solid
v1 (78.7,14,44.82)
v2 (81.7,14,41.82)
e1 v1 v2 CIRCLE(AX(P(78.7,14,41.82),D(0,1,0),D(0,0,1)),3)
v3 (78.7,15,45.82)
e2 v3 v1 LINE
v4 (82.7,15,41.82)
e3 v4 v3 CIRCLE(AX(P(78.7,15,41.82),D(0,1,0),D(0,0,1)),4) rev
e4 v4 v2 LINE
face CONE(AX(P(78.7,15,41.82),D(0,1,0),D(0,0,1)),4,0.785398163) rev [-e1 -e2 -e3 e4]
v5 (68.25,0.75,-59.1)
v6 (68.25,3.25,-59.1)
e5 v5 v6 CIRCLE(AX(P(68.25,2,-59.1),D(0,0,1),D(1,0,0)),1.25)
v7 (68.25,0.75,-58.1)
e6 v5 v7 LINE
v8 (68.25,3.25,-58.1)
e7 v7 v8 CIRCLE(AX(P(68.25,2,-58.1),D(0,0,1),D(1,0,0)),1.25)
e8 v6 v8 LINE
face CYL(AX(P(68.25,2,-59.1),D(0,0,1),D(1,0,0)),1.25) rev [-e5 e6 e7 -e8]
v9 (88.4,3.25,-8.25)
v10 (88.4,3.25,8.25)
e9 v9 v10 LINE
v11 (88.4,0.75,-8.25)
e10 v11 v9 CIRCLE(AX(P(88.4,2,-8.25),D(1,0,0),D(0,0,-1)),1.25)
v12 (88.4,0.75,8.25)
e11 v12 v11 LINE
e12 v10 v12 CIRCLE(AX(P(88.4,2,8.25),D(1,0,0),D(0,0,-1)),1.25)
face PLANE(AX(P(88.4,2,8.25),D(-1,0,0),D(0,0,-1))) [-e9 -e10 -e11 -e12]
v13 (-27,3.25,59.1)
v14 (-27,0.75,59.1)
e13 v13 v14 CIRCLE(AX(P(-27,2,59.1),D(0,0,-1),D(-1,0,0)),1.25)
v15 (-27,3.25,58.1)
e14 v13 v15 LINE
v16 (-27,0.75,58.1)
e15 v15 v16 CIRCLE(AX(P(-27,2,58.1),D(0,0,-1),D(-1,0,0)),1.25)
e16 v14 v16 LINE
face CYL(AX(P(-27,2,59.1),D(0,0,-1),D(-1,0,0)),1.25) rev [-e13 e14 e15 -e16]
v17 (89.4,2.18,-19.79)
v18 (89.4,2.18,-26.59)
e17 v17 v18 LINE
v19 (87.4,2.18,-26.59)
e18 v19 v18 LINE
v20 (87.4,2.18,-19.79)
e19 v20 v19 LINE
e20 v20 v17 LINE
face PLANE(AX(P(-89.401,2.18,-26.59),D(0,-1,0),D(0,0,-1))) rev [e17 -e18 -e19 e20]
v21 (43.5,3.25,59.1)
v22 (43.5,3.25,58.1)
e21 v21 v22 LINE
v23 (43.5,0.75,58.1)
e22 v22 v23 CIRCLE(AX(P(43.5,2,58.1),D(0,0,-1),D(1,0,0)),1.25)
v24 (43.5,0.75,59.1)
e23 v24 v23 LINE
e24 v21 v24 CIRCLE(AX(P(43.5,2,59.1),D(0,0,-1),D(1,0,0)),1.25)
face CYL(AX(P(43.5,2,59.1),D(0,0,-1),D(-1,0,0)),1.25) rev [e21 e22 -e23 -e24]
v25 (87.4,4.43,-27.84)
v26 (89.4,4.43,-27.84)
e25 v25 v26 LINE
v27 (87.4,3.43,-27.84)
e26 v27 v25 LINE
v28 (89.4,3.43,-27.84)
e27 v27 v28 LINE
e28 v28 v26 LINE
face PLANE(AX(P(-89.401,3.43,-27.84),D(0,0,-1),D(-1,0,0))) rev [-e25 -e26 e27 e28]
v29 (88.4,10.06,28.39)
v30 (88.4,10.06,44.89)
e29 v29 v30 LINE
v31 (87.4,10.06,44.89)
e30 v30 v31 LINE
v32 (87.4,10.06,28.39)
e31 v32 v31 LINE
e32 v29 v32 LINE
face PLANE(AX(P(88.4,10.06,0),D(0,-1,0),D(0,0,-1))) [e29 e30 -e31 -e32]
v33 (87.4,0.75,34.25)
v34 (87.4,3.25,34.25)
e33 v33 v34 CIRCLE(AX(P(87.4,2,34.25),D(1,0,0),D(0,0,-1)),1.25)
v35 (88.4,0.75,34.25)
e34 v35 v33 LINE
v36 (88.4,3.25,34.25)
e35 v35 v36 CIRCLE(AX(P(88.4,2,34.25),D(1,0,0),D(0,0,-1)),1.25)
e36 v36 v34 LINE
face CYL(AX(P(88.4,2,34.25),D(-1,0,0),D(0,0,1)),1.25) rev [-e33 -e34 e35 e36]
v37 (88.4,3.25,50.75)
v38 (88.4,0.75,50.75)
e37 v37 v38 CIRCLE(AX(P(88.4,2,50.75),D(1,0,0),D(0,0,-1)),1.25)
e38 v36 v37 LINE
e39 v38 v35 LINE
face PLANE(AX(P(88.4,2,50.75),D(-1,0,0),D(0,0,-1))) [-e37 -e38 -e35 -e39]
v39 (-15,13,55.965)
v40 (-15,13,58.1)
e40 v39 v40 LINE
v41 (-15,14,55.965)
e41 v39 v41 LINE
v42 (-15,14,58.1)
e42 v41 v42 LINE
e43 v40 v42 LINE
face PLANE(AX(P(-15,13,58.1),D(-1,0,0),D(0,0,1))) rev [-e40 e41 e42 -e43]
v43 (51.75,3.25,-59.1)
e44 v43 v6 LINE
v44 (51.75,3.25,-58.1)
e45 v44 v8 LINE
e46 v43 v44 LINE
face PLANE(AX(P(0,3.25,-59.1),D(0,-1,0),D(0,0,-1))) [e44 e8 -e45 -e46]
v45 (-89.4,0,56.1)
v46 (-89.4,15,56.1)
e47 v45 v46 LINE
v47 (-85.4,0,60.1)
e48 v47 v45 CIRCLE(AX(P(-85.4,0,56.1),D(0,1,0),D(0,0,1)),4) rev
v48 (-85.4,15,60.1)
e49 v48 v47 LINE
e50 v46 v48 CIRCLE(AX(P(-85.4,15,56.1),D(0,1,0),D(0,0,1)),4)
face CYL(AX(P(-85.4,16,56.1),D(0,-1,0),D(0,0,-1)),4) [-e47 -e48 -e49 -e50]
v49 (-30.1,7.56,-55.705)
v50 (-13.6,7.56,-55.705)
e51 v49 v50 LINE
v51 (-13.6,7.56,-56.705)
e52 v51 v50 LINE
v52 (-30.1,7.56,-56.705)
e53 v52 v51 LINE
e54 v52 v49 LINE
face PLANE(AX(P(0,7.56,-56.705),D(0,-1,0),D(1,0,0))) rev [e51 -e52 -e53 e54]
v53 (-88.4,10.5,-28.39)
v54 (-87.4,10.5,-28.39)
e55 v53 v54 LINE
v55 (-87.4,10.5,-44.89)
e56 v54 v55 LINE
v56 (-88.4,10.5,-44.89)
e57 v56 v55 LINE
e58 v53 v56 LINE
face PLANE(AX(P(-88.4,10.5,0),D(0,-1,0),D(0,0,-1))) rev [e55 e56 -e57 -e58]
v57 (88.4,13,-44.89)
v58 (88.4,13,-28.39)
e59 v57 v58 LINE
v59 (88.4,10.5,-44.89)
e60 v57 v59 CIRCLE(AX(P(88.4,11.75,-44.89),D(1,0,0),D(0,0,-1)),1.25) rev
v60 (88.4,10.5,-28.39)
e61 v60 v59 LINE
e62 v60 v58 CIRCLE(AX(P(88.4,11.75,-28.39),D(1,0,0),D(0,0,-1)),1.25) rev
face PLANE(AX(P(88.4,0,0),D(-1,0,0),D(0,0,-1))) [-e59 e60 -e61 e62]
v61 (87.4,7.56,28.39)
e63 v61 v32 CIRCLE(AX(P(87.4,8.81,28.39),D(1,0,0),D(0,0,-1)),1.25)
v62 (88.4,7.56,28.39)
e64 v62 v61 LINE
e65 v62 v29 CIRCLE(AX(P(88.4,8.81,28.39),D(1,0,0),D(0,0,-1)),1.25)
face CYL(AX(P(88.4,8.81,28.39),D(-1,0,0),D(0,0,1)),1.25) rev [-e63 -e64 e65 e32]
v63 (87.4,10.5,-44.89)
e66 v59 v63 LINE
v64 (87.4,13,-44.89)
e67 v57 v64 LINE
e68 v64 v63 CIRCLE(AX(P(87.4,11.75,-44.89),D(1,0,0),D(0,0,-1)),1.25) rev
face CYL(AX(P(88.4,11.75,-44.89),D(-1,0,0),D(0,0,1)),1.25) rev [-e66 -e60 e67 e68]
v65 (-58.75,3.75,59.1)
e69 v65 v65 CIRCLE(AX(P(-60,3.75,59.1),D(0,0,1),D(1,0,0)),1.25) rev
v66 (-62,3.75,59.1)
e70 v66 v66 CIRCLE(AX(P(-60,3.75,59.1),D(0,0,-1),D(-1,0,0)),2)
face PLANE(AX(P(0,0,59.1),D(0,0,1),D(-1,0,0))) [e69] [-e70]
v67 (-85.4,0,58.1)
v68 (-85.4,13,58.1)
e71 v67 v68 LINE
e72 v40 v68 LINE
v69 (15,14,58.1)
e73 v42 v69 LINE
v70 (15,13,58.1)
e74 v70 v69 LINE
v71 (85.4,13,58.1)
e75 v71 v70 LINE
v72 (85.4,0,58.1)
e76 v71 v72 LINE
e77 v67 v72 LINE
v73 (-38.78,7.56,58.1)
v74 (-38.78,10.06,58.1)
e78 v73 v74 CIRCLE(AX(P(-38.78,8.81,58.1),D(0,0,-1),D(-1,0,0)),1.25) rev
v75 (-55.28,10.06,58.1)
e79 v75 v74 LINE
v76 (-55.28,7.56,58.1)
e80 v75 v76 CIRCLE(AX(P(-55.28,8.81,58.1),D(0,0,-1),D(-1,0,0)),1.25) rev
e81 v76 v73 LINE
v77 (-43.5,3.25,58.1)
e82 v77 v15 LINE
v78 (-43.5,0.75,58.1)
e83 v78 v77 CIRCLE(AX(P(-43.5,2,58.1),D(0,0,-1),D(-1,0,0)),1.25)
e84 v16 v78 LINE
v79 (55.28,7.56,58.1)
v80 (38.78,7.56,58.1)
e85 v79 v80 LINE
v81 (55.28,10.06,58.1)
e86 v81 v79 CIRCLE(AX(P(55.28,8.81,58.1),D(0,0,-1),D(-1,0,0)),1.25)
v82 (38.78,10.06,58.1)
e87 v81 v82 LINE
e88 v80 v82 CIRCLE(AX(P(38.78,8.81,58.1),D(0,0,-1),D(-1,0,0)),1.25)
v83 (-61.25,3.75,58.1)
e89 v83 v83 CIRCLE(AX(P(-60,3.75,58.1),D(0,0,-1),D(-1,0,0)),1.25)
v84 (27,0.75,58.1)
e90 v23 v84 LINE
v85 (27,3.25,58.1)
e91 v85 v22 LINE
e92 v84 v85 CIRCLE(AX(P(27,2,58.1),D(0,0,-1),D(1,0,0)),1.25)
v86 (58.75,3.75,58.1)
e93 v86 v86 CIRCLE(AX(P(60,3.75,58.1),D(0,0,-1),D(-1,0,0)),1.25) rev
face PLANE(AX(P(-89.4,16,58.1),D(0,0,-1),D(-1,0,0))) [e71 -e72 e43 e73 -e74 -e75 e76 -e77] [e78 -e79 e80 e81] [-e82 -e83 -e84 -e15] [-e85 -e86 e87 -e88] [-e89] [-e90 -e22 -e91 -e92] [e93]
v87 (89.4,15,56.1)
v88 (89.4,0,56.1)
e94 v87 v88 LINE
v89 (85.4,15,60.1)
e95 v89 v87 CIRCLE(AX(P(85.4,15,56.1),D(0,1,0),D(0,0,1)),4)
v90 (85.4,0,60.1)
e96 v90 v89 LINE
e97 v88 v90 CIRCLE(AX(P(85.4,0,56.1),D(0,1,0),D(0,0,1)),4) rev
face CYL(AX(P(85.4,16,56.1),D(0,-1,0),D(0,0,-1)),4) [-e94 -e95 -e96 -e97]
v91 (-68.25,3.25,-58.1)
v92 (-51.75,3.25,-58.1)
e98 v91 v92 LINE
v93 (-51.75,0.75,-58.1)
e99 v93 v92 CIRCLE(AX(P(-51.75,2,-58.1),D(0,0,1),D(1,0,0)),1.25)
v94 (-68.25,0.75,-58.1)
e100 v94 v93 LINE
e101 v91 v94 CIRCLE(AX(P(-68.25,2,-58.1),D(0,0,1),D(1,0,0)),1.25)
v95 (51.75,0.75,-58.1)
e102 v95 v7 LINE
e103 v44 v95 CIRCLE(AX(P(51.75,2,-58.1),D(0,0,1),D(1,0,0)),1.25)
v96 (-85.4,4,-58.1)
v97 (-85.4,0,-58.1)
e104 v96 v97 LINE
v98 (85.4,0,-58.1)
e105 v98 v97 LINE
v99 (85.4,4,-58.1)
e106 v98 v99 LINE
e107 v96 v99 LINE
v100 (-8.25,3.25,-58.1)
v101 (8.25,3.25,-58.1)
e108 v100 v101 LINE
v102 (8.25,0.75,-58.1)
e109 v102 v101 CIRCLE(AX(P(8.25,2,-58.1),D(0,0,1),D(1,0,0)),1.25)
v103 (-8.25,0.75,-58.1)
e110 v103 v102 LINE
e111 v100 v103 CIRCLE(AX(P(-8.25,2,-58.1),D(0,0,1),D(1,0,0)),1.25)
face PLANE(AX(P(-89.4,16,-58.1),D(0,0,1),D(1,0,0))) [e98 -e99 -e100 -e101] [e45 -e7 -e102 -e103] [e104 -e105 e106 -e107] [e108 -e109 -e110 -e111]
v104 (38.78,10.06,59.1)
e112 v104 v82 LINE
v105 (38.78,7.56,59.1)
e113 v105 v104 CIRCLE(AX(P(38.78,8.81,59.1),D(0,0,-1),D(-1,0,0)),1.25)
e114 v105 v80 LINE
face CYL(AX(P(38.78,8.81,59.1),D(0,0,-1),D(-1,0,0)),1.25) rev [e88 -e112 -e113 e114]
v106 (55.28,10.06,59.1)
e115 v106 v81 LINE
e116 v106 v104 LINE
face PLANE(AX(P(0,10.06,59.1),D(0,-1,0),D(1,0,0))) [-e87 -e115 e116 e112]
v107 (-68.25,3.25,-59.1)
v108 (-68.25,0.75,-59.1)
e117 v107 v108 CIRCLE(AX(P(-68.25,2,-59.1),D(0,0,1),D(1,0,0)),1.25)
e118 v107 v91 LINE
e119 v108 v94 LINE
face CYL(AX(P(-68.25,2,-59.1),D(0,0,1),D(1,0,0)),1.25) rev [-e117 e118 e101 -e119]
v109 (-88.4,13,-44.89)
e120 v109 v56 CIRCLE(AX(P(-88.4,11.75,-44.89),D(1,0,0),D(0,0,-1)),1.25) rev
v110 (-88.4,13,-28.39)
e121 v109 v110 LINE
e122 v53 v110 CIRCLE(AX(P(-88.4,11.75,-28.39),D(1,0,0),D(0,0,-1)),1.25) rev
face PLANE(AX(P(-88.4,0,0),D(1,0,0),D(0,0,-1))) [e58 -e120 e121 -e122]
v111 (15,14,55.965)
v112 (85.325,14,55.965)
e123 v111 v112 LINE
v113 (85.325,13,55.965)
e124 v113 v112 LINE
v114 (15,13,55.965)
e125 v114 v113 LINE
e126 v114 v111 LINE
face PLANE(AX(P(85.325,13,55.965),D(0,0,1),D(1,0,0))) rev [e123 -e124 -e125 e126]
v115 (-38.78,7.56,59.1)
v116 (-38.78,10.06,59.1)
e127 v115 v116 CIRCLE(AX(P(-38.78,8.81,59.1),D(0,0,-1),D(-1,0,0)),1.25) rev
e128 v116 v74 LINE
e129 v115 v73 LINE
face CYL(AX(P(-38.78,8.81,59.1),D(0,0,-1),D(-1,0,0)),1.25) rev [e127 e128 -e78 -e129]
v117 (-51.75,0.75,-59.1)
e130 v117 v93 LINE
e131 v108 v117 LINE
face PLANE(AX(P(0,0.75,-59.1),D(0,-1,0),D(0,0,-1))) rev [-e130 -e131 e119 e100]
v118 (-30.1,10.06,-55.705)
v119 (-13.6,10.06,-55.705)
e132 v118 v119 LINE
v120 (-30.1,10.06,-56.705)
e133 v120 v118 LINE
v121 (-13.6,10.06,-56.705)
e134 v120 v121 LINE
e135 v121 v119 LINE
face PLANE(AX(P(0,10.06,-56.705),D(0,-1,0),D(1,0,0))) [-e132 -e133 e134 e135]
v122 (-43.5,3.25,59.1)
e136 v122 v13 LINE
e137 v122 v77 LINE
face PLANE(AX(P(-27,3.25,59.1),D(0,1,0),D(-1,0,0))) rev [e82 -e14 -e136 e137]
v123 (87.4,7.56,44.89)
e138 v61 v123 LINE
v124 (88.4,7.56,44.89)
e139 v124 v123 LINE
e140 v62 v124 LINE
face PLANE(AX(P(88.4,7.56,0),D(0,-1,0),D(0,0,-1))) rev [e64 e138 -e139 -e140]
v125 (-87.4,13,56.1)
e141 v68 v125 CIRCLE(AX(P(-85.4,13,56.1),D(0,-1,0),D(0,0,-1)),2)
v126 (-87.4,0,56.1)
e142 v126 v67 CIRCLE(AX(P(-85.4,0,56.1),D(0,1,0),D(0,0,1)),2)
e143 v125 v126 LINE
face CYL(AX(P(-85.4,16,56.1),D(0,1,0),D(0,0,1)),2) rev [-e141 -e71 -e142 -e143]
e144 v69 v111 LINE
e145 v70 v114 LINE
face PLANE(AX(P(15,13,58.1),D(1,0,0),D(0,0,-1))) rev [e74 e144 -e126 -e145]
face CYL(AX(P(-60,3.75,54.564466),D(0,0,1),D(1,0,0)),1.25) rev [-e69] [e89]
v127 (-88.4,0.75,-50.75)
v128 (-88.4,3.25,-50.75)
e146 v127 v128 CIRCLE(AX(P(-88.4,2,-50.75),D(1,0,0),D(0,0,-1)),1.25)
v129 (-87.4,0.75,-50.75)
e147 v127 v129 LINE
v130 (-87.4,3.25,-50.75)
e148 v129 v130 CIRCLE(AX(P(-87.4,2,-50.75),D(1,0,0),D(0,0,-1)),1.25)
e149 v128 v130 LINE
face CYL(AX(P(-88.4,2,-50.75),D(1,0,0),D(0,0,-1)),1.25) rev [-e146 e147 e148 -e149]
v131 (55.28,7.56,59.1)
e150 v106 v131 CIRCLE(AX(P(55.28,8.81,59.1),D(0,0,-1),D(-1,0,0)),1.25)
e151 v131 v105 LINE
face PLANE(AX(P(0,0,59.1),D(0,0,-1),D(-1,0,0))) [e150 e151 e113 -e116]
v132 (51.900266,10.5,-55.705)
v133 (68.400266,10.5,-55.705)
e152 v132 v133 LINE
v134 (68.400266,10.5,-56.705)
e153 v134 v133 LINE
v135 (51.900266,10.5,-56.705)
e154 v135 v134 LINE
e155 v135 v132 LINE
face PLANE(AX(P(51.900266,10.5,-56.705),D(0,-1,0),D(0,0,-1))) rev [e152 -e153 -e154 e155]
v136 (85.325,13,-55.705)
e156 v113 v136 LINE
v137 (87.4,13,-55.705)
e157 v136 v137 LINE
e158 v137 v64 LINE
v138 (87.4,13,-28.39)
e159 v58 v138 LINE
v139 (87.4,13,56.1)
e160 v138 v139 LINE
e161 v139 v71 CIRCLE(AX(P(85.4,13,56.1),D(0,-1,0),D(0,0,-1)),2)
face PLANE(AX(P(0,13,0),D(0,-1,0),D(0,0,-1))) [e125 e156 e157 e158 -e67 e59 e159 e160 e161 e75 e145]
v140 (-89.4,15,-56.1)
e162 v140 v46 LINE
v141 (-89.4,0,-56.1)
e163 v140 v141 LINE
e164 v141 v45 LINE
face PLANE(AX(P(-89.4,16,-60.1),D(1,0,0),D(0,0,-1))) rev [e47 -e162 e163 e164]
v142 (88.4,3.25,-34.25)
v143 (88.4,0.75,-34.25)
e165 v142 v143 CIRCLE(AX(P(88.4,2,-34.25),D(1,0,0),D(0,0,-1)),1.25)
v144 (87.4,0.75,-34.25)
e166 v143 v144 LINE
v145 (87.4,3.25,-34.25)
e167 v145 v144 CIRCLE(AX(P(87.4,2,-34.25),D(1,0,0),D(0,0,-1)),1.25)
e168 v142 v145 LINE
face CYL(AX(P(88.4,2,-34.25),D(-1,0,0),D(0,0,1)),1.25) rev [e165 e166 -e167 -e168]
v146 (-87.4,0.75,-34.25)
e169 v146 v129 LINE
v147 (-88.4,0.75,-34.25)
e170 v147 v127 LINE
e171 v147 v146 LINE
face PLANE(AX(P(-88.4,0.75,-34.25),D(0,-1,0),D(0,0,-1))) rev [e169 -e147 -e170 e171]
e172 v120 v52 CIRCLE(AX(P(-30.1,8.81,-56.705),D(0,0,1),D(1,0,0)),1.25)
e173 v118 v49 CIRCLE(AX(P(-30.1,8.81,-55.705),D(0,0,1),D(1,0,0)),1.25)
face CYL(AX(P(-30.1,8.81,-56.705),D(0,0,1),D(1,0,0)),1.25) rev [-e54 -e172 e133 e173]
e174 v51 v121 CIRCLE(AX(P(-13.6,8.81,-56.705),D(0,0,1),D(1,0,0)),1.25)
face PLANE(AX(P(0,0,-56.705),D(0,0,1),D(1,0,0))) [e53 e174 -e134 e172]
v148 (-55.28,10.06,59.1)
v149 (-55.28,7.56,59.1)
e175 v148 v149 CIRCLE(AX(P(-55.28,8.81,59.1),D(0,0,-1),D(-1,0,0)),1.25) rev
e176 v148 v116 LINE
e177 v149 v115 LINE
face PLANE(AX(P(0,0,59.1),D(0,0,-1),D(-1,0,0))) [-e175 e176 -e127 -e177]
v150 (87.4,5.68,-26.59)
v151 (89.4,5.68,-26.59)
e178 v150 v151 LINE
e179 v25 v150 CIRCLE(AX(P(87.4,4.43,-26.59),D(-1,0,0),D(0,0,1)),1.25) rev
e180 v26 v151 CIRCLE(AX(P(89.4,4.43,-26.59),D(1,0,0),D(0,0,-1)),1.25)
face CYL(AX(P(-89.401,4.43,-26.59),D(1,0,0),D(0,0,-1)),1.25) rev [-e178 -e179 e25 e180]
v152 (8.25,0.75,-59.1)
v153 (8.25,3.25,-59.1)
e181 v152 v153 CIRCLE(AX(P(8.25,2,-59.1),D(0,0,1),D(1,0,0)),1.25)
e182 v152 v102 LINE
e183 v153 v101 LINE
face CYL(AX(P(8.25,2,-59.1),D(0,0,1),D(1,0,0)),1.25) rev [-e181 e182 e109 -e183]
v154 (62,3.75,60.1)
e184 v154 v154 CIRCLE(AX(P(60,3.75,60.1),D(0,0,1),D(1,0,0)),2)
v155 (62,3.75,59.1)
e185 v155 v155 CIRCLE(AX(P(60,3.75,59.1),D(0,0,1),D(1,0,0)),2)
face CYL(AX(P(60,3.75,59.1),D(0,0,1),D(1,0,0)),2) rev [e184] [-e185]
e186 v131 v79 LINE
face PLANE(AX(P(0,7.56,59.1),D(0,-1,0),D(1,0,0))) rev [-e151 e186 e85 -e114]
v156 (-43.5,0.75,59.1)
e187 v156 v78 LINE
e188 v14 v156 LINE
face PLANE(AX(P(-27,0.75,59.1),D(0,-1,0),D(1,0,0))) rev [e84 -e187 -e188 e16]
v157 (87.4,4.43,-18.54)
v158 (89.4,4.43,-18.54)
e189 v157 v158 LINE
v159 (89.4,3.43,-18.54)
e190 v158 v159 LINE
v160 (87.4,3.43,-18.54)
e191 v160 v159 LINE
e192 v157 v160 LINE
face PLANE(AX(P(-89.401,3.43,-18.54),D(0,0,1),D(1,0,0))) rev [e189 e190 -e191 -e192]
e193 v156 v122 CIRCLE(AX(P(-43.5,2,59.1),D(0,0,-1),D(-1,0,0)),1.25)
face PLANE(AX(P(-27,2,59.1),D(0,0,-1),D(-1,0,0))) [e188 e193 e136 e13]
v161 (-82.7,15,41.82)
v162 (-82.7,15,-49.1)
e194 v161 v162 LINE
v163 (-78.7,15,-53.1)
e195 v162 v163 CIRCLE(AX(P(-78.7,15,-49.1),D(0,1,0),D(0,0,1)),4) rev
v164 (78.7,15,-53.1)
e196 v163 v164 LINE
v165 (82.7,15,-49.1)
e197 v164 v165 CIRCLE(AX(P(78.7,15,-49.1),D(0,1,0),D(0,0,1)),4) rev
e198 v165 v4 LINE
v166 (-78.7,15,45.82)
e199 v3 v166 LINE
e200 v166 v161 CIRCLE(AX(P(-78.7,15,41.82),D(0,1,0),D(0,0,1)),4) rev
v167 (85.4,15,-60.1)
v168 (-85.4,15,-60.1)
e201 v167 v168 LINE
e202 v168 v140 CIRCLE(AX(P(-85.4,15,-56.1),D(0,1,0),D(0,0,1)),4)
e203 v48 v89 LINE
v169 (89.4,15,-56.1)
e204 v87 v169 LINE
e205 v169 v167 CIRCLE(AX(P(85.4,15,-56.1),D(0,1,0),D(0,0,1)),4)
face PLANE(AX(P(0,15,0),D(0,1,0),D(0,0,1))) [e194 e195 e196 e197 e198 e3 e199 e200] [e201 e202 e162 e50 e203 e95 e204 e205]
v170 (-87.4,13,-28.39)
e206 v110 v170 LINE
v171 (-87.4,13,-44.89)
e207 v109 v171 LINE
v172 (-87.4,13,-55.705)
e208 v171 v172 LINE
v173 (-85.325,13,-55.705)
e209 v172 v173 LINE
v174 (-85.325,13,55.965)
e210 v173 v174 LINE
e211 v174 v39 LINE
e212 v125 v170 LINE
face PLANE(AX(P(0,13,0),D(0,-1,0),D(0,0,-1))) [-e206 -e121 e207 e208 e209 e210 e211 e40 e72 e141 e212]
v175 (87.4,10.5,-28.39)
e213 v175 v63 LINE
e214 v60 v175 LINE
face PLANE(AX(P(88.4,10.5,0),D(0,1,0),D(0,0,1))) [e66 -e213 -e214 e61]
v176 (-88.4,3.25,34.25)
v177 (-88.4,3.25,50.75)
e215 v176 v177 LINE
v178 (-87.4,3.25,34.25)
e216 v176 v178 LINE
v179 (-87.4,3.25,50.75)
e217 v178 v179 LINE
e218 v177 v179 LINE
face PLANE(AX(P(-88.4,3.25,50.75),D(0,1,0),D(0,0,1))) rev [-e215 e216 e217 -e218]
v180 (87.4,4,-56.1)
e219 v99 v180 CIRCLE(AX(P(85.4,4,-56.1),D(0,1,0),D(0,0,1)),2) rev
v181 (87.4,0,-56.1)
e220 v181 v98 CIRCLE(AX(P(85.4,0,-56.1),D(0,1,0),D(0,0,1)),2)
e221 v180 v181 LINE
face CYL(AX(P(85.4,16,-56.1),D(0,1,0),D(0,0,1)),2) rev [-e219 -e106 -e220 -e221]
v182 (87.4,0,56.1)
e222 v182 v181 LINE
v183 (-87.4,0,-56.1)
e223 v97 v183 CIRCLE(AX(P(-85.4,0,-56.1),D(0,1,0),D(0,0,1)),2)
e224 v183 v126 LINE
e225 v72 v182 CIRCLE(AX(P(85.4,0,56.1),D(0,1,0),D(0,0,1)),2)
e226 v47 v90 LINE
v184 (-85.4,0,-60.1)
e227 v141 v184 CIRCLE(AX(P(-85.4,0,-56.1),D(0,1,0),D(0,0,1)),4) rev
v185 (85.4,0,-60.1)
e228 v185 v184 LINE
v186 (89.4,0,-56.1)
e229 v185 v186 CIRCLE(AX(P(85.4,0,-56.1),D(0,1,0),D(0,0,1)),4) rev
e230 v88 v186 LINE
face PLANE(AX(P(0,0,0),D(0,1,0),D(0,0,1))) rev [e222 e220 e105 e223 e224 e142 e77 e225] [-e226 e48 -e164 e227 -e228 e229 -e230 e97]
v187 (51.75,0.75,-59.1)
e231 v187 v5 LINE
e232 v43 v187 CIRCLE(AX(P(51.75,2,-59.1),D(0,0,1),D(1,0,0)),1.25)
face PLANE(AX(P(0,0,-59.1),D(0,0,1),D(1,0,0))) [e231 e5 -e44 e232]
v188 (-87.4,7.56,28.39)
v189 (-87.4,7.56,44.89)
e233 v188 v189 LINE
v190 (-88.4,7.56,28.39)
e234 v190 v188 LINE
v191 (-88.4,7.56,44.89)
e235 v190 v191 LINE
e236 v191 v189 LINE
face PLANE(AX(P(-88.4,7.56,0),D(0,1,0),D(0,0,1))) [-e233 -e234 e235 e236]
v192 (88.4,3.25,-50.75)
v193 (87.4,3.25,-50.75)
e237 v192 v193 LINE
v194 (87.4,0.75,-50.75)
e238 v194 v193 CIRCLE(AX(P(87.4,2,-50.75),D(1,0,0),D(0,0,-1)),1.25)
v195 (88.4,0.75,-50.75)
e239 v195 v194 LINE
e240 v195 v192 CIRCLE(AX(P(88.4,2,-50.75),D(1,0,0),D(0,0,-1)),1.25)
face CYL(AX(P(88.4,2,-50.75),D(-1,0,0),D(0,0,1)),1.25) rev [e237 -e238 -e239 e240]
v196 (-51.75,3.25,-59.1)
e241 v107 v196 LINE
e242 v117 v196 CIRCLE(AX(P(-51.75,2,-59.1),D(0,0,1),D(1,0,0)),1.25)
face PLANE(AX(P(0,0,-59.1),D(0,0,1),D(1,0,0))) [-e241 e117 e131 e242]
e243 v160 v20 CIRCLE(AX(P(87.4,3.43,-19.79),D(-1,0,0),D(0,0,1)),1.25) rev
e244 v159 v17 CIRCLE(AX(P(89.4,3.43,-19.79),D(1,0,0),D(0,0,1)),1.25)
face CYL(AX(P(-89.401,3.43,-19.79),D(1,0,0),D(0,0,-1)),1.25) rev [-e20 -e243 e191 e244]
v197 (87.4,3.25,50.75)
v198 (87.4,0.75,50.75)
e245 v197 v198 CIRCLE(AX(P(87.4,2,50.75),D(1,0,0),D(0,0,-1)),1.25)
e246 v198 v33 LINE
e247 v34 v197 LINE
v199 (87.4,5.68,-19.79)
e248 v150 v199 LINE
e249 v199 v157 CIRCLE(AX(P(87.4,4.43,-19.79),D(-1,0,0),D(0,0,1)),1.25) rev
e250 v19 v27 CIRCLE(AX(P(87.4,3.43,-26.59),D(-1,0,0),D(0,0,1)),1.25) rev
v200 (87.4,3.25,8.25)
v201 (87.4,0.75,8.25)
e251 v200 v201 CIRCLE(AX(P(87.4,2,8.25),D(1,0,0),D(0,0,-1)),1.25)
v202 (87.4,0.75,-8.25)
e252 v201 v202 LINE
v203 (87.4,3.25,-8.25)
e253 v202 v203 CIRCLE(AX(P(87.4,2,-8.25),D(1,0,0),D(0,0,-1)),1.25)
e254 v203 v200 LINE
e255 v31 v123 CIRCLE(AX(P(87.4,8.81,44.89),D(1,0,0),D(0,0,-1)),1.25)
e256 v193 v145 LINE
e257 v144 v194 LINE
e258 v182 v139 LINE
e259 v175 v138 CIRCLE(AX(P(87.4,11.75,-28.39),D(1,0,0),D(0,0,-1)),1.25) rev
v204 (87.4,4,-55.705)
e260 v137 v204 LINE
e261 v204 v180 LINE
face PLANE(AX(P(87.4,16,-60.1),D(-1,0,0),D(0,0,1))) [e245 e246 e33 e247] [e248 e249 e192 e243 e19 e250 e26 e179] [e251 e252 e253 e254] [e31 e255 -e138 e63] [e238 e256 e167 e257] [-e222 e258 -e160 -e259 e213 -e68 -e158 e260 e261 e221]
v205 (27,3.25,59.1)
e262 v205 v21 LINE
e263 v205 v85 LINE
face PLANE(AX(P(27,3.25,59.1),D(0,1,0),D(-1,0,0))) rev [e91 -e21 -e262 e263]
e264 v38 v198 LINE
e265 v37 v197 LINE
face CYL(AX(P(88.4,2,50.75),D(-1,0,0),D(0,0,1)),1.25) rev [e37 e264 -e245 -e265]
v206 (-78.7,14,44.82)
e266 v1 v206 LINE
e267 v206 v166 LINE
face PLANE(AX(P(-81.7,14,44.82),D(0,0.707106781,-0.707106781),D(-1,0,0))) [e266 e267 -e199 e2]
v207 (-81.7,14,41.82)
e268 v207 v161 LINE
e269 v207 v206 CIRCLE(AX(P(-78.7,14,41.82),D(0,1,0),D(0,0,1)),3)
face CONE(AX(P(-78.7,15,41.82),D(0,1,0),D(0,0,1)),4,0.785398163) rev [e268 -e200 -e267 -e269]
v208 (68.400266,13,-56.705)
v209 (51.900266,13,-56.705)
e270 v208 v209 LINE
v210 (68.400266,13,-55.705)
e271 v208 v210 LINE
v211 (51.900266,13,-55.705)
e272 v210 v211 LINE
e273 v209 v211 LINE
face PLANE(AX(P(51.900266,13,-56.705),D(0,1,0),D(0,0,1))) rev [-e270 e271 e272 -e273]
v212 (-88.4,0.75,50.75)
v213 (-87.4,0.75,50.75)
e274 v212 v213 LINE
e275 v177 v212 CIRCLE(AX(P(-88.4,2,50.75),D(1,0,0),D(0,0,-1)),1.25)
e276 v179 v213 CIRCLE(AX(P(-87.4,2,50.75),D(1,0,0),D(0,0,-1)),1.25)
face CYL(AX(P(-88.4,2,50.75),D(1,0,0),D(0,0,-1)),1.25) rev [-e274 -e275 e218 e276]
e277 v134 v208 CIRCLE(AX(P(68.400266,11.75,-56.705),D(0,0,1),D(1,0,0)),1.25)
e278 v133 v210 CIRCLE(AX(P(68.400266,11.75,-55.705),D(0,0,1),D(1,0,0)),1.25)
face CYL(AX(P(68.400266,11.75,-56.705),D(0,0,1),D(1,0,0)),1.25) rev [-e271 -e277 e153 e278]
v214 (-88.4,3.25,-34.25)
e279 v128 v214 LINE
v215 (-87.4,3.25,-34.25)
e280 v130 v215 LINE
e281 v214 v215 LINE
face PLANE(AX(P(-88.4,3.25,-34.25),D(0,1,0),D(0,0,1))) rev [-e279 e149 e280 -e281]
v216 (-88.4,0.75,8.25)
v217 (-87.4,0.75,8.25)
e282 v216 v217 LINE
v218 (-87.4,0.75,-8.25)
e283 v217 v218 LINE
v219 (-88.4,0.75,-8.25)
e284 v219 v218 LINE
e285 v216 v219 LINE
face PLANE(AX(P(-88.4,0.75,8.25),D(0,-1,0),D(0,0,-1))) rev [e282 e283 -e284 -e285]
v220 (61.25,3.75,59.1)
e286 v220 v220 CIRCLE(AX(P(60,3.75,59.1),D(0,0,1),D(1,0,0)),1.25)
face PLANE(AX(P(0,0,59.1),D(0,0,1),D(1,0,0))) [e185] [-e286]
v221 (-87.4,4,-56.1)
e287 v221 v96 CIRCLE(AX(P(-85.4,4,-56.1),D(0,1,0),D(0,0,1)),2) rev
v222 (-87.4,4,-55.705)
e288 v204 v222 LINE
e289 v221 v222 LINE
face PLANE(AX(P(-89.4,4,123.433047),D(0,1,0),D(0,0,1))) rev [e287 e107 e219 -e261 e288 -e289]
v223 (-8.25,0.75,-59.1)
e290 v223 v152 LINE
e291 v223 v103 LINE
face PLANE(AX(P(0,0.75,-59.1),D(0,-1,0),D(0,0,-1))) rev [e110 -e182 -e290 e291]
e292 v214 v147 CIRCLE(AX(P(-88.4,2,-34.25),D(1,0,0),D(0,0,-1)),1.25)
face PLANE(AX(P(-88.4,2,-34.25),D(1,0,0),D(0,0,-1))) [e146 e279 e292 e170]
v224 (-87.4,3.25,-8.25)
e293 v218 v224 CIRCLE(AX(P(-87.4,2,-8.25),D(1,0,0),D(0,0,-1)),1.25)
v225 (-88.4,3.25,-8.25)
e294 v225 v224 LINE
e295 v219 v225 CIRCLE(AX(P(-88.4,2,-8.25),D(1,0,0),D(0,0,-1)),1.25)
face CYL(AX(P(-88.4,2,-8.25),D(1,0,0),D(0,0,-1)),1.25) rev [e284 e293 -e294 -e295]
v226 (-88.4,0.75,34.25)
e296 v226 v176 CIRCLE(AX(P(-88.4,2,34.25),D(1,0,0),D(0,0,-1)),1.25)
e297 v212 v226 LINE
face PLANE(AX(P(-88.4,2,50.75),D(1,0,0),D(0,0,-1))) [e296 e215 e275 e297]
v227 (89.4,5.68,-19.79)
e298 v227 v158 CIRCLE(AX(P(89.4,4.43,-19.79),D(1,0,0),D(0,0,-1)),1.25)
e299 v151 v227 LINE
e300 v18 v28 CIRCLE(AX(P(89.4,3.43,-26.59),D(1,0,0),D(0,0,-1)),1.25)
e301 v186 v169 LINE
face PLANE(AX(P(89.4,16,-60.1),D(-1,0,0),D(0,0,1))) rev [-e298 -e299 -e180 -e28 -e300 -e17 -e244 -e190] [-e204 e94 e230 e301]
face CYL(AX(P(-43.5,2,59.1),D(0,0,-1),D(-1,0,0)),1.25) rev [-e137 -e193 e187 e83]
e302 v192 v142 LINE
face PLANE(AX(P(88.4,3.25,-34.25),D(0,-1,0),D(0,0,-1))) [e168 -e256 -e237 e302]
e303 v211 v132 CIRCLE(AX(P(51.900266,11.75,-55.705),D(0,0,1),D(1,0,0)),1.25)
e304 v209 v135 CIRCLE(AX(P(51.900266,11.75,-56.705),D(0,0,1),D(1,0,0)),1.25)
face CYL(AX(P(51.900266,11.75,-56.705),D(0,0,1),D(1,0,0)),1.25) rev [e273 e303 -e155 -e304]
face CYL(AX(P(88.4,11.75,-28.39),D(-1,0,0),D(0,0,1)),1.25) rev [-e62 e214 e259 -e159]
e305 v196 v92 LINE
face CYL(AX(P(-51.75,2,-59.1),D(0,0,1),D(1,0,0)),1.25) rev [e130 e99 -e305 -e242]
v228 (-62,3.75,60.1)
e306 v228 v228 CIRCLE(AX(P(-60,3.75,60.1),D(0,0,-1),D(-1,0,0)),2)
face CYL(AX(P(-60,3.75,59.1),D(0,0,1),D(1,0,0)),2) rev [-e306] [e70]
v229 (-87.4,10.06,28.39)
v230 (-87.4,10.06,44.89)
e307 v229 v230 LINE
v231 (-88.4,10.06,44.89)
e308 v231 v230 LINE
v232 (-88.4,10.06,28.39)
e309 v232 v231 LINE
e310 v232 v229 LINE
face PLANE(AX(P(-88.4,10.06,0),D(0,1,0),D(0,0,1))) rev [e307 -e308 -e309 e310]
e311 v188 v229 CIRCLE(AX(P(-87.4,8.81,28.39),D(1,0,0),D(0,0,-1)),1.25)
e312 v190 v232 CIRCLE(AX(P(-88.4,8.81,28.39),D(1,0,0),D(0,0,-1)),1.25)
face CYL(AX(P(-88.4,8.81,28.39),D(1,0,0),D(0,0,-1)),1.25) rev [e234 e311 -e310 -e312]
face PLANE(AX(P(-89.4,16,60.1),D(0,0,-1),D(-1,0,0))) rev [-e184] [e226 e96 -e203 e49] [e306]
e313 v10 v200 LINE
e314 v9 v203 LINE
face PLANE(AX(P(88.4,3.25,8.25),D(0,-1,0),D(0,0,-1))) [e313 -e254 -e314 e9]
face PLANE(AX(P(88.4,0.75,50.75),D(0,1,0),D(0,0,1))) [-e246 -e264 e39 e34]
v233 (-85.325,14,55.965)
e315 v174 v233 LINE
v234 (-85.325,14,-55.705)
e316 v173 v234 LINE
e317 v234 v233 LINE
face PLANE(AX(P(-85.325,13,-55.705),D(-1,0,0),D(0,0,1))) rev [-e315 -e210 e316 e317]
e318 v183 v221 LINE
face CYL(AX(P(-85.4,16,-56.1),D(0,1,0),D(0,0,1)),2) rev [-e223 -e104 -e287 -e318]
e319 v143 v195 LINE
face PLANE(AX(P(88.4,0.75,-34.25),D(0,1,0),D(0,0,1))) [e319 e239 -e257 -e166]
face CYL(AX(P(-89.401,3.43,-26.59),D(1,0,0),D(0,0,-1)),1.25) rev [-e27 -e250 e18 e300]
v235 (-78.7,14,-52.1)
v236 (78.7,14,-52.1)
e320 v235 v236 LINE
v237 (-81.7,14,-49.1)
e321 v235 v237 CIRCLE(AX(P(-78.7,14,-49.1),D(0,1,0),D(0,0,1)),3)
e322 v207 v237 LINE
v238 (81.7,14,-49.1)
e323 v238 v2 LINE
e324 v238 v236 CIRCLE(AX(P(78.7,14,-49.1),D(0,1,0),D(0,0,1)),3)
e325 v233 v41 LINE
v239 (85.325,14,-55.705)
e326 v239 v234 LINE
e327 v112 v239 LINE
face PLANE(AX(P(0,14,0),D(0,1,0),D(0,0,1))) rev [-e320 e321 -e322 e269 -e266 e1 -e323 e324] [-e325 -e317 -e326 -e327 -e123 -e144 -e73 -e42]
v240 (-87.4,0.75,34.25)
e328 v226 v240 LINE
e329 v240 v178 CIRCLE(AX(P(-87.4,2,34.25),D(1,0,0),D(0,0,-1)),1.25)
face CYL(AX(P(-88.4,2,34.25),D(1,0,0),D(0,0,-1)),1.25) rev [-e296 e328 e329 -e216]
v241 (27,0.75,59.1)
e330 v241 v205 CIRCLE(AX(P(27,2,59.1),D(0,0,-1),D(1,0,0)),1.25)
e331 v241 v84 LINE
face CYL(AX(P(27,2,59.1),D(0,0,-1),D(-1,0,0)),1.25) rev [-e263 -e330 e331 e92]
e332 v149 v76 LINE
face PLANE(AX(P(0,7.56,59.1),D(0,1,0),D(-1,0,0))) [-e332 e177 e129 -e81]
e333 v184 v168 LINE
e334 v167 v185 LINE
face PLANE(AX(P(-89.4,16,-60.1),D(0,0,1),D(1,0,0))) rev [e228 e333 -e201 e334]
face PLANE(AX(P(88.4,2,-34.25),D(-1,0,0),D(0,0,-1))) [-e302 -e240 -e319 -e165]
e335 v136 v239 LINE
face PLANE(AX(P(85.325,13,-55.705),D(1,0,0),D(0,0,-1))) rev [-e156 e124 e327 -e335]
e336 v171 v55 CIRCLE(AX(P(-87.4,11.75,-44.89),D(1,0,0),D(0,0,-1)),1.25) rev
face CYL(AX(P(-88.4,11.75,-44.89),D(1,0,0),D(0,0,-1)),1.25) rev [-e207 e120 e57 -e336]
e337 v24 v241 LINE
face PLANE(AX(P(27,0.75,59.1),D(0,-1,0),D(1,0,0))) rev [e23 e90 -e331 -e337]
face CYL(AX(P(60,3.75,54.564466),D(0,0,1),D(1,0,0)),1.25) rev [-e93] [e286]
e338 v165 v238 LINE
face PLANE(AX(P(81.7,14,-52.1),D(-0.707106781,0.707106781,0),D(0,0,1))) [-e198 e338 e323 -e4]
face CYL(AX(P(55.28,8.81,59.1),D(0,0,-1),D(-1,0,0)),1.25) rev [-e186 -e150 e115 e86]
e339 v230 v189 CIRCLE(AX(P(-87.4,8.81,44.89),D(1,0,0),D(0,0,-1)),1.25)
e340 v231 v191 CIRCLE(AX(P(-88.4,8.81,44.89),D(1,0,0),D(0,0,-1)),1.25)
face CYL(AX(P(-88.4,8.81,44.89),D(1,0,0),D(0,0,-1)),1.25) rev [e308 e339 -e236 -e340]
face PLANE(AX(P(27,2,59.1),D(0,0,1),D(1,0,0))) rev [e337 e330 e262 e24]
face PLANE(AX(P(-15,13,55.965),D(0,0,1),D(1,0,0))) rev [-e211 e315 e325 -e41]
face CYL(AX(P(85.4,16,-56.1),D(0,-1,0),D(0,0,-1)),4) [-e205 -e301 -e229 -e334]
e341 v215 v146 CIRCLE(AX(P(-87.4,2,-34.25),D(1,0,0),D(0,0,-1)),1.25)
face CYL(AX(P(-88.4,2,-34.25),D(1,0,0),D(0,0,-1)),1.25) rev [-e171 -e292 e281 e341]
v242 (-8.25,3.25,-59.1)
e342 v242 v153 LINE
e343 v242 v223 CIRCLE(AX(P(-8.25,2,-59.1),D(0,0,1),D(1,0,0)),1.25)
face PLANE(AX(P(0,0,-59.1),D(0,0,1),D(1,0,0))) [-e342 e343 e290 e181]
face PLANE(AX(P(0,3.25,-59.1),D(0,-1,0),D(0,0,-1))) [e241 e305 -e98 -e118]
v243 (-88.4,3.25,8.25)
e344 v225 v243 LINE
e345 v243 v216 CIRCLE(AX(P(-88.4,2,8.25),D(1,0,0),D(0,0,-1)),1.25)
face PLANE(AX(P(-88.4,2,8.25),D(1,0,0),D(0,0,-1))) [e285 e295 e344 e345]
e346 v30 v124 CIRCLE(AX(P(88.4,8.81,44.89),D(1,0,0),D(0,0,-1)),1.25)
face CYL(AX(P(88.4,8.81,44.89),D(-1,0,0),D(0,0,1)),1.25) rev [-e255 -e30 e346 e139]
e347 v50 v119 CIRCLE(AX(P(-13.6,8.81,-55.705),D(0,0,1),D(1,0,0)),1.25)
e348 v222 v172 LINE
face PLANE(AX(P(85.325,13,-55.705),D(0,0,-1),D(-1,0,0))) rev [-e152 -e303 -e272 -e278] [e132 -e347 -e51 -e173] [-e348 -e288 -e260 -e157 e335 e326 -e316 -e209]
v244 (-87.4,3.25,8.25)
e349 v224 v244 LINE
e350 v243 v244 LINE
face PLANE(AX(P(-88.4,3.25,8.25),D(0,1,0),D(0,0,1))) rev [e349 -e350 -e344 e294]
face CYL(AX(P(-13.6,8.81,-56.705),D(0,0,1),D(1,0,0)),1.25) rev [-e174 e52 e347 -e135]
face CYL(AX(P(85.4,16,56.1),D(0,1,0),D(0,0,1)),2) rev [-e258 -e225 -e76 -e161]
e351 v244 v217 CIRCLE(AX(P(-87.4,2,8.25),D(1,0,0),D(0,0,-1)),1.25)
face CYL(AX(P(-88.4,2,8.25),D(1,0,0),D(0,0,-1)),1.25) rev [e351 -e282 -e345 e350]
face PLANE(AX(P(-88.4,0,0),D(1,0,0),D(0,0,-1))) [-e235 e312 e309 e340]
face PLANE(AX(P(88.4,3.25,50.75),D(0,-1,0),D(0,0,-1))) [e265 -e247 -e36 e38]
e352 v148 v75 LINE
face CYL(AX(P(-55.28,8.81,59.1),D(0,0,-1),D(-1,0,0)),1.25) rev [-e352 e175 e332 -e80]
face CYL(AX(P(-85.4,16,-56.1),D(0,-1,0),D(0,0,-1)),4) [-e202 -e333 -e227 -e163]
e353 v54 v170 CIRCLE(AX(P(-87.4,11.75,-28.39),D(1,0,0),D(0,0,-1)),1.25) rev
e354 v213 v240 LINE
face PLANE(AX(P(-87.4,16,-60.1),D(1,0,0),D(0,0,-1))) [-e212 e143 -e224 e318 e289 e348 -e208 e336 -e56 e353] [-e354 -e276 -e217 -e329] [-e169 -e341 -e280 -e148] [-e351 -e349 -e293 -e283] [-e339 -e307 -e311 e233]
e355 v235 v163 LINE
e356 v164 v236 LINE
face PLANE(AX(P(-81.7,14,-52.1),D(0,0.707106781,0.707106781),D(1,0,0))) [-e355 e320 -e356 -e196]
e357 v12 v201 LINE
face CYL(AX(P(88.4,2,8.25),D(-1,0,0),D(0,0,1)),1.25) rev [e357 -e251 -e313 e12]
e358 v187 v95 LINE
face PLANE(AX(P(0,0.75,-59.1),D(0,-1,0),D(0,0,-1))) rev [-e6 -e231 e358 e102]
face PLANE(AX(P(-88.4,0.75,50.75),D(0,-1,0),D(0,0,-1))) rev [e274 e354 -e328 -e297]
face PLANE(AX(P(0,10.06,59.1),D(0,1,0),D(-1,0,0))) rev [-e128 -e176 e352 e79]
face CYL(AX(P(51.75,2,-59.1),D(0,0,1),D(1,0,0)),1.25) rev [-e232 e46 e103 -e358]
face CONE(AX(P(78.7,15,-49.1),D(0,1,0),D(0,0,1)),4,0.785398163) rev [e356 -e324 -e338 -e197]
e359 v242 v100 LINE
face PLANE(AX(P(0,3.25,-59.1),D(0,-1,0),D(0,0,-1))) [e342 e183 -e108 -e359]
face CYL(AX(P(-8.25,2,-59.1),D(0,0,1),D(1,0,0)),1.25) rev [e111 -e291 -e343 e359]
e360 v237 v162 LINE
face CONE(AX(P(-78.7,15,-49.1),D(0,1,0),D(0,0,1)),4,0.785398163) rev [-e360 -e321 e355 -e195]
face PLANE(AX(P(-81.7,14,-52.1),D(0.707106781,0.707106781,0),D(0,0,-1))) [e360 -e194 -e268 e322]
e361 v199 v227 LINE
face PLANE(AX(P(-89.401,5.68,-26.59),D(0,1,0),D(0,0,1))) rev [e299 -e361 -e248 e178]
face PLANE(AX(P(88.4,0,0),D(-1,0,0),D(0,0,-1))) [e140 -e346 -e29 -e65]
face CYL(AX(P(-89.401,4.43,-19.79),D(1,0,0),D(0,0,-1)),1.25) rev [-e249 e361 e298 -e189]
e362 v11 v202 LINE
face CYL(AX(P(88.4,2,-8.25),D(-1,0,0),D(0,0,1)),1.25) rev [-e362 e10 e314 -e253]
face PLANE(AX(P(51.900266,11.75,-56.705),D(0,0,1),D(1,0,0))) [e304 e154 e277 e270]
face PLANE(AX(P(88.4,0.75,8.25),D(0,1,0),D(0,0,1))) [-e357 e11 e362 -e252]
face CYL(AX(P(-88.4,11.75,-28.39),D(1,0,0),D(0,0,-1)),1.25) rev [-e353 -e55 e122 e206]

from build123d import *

# Parameters (mm, degrees)
SKETCH_1_W           = 178.8
SKETCH_1_H           = 120.2
EXTRUDE_1_DEPTH      = 16
SHELL_1_T            = -2
SKETCH_4_W           = 178.821358432
SKETCH_4_H           = 120.2
CUT_EXTRUDE_2_DEPTH  = 1
SKETCH_2_W           = 163.4
SKETCH_2_H           = 96.92
CUT_EXTRUDE_1_DEPTH  = 1
FILLET_2_R           = 3
CHAMFER_1_SIZE       = 1
EXTRUDE_2_DEPTH      = 1
SKETCH1_W            = 178.8
SKETCH1_H            = 11
BOSS_EXTRUDE1_DEPTH  = 2.395
FILLET_1_R           = 4
CUT_EXTRUDE_3_DEPTH  = 1
CUT_EXTRUDE_4_DEPTH  = 1
CUT_EXTRUDE1_DEPTH   = 1
CUT_EXTRUDE_5_DEPTH  = 1
CUT_EXTRUDE_7_REACH  = 191.226
CUT_EXTRUDE_9_DEPTH  = 1
CUT_EXTRUDE3_DEPTH   = 1
CUT_EXTRUDE_10_DEPTH = 1
CUT_EXTRUDE2_DEPTH   = 1
FILLET1_R            = 2
SKETCH4_R            = 2
SKETCH4_R_2          = 1.25
CUT_EXTRUDE4_DEPTH   = 1
SKETCH4_3_R          = 1.25
CUT_EXTRUDE5_DEPTH   = 2
CUT_EXTRUDE6_DEPTH   = 1


with BuildPart() as part:
    # 草圖1 → 填料-伸長1 (new body)
    with BuildSketch(Plane(origin=(0, 0, 0), x_dir=(1, 0, 0), z_dir=(0, 1, 0))):
        Rectangle(SKETCH_1_W, SKETCH_1_H)
    extrude(amount=EXTRUDE_1_DEPTH)

    # 薄殼1
    shell_1_openings = [part.faces().sort_by_distance(p)[0] for p in [
        (0, 0, 0),
    ]]
    offset(amount=SHELL_1_T, openings=shell_1_openings, kind=Kind.INTERSECTION)

    # 草圖4 → 除料-伸長2 (cut)
    with BuildSketch(Plane(origin=(0, 16, 0), x_dir=(1, 0, 0), z_dir=(0, 1, 0))):
        Rectangle(SKETCH_4_W, SKETCH_4_H)
    extrude(amount=-CUT_EXTRUDE_2_DEPTH, mode=Mode.SUBTRACT)

    # 草圖2 → 除料-伸長1 (cut)
    with BuildSketch(Plane(origin=(0, 15, 0), x_dir=(1, 0, 0), z_dir=(0, 1, 0))):
        with Locations((0, 3.64)):
            Rectangle(SKETCH_2_W, SKETCH_2_H)
    extrude(amount=-CUT_EXTRUDE_1_DEPTH, mode=Mode.SUBTRACT)

    # 圓角2
    fillet_2_edges = [part.edges().sort_by_distance(p)[0] for p in [
        (81.7, 14.5, -52.1),
        (81.7, 14.5, 44.82),
        (-81.7, 14.5, 44.82),
        (-81.7, 14.5, -52.1),
    ]]
    fillet(fillet_2_edges, radius=FILLET_2_R)

    # 導角1
    chamfer_1_edges = [part.edges().sort_by_distance(p)[0] for p in [
        (0, 15, 44.82),
        (80.821320344, 15, 43.941320344),
        (-80.821320344, 15, 43.941320344),
        (81.7, 15, -3.64),
        (-81.7, 15, -3.64),
        (80.821320344, 15, -51.221320344),
        (-80.821320344, 15, -51.221320344),
        (0, 15, -52.1),
    ]]
    chamfer(chamfer_1_edges, length=CHAMFER_1_SIZE - 0.0001)  # a hair under: the kernel refuses the full size

    # 草圖13 → 填料-伸長2 (add)
    with BuildSketch(Plane.XZ.offset(-14)):
        Polygon((-87.4, 58.1), (-15, 58.1), (-15, 55.965), (-85.325, 55.965), (-85.325, -55.705), (85.325, -55.705), (85.325, 55.965), (15, 55.965), (15, 58.1), (87.4, 58.1), (87.4, -58.1), (-87.4, -58.1), align=None)
    extrude(amount=EXTRUDE_2_DEPTH)

    # Sketch1 → Boss-Extrude1 (add)
    with BuildSketch(Plane.XY.offset(-58.1)):
        with Locations((0, 9.5)):
            Rectangle(SKETCH1_W, SKETCH1_H)
    extrude(amount=BOSS_EXTRUDE1_DEPTH)

    # 圓角1
    fillet_1_edges = [part.edges().sort_by_distance(p)[0] for p in [
        (89.4, 7.5, 60.1),
        (-89.4, 7.5, 60.1),
        (-89.4, 7.5, -60.1),
        (89.4, 7.5, -60.1),
    ]]
    fillet(fillet_1_edges, radius=FILLET_1_R)

    # 草圖5 → 除料-伸長3 (cut)
    with BuildSketch(Plane.XY.offset(-55.705)):
        with BuildLine():
            Line((-30.1, 7.56), (-13.6, 7.56))
            ThreePointArc((-13.6, 7.56), (-12.35, 8.81), (-13.6, 10.06))
            Line((-13.6, 10.06), (-30.1, 10.06))
            ThreePointArc((-30.1, 10.06), (-31.35, 8.81), (-30.1, 7.56))
        make_face()
    extrude(amount=-CUT_EXTRUDE_3_DEPTH, mode=Mode.SUBTRACT)

    # 草圖6 → 除料-伸長4 (cut)
    with BuildSketch(Plane(origin=(-87.4, 0, 0), x_dir=(0, 0, -1), z_dir=(1, 0, 0))):
        with BuildLine():
            Line((-28.39, 10.06), (-44.89, 10.06))
            ThreePointArc((-44.89, 10.06), (-46.14, 8.81), (-44.89, 7.56))
            Line((-44.89, 7.56), (-28.39, 7.56))
            ThreePointArc((-28.39, 7.56), (-27.14, 8.81), (-28.39, 10.06))
        make_face()
    cut_extrude_4 = extrude(amount=-CUT_EXTRUDE_4_DEPTH, mode=Mode.SUBTRACT)

    # Mirror4: 除料-伸長4 across plane
    add(cut_extrude_4.mirror(Plane.ZY), mode=Mode.SUBTRACT)

    # 草圖6<4> → Cut-Extrude1 (cut)
    with BuildSketch(Plane(origin=(-87.4, 0, 0), x_dir=(0, 0, -1), z_dir=(1, 0, 0))):
        with BuildLine():
            ThreePointArc((44.89, 13), (46.14, 11.75), (44.89, 10.5))
            Line((44.89, 10.5), (28.39, 10.5))
            ThreePointArc((28.39, 10.5), (27.14, 11.75), (28.39, 13))
            Line((28.39, 13), (44.89, 13))
        make_face()
    cut_extrude1 = extrude(amount=-CUT_EXTRUDE1_DEPTH, mode=Mode.SUBTRACT)

    # Mirror2: Cut-Extrude1 across plane
    add(cut_extrude1.mirror(Plane.ZY), mode=Mode.SUBTRACT)

    # 草圖7 → 除料-伸長5 (cut)
    with BuildSketch(Plane(origin=(0, 0, 58.1), x_dir=(-1, 0, 0), z_dir=(0, 0, -1))):
        with BuildLine():
            Line((-55.28, 7.56), (-38.78, 7.56))
            ThreePointArc((-38.78, 7.56), (-37.53, 8.81), (-38.78, 10.06))
            Line((-38.78, 10.06), (-55.28, 10.06))
            ThreePointArc((-55.28, 10.06), (-56.53, 8.81), (-55.28, 7.56))
        make_face()
        with BuildLine():
            ThreePointArc((38.78, 7.56), (37.53, 8.81), (38.78, 10.06))
            Line((38.78, 10.06), (55.28, 10.06))
            ThreePointArc((55.28, 10.06), (56.53, 8.81), (55.28, 7.56))
            Line((55.28, 7.56), (38.78, 7.56))
        make_face()
    extrude(amount=-CUT_EXTRUDE_5_DEPTH, mode=Mode.SUBTRACT)

    # 草圖9 → 除料-伸長7 (cut, up to next)
    with BuildSketch(Plane(origin=(89.4, 0, 0), x_dir=(0, 0, -1), z_dir=(1, 0, 0)), mode=Mode.PRIVATE) as cut_extrude_7_sk1:
        with BuildLine():
            Line((26.59, 2.18), (19.79, 2.18))
            ThreePointArc((19.79, 2.18), (18.906116524, 2.546116524), (18.54, 3.43))
            Line((18.54, 3.43), (18.54, 4.43))
            ThreePointArc((18.54, 4.43), (18.906116524, 5.313883476), (19.79, 5.68))
            Line((19.79, 5.68), (26.59, 5.68))
            ThreePointArc((26.59, 5.68), (27.473883476, 5.313883476), (27.84, 4.43))
            Line((27.84, 4.43), (27.84, 3.43))
            ThreePointArc((27.84, 3.43), (27.473883476, 2.546116524), (26.59, 2.18))
        make_face()
    cut_extrude_7_tool1 = extrude(cut_extrude_7_sk1.sketch, amount=-CUT_EXTRUDE_7_REACH, mode=Mode.PRIVATE) & part.part
    add(cut_extrude_7_tool1.solids().sort_by_distance((89.4, 3.93, -23.19))[0], mode=Mode.SUBTRACT)

    # 草圖11 → 除料-伸長9 (cut)
    with BuildSketch(Plane.XY.offset(-58.1)):
        with BuildLine():
            Line((-8.25, 0.75), (8.25, 0.75))
            ThreePointArc((8.25, 0.75), (9.5, 2), (8.25, 3.25))
            Line((8.25, 3.25), (-8.25, 3.25))
            ThreePointArc((-8.25, 3.25), (-9.5, 2), (-8.25, 0.75))
        make_face()
    extrude(amount=-CUT_EXTRUDE_9_DEPTH, mode=Mode.SUBTRACT)

    # 草圖11<3> → Cut-Extrude3 (cut)
    with BuildSketch(Plane.XY.offset(-58.1)):
        with BuildLine():
            Line((51.75, 0.75), (68.25, 0.75))
            ThreePointArc((68.25, 0.75), (69.5, 2), (68.25, 3.25))
            Line((68.25, 3.25), (51.75, 3.25))
            ThreePointArc((51.75, 3.25), (50.5, 2), (51.75, 0.75))
        make_face()
        with BuildLine():
            Line((-68.25, 0.75), (-51.75, 0.75))
            ThreePointArc((-51.75, 0.75), (-50.5, 2), (-51.75, 3.25))
            Line((-51.75, 3.25), (-68.25, 3.25))
            ThreePointArc((-68.25, 3.25), (-69.5, 2), (-68.25, 0.75))
        make_face()
    extrude(amount=-CUT_EXTRUDE3_DEPTH, mode=Mode.SUBTRACT)

    # 草圖12 → 除料-伸長10 (cut)
    with BuildSketch(Plane(origin=(-87.4, 0, 0), x_dir=(0, 0, -1), z_dir=(1, 0, 0))):
        with BuildLine():
            Line((-8.25, 3.25), (8.25, 3.25))
            ThreePointArc((8.25, 3.25), (9.5, 2), (8.25, 0.75))
            Line((8.25, 0.75), (-8.25, 0.75))
            ThreePointArc((-8.25, 0.75), (-9.5, 2), (-8.25, 3.25))
        make_face()
        with BuildLine():
            Line((34.25, 3.25), (50.75, 3.25))
            ThreePointArc((50.75, 3.25), (52, 2), (50.75, 0.75))
            Line((50.75, 0.75), (34.25, 0.75))
            ThreePointArc((34.25, 0.75), (33, 2), (34.25, 3.25))
        make_face()
        with BuildLine():
            Line((-50.75, 3.25), (-34.25, 3.25))
            ThreePointArc((-34.25, 3.25), (-33, 2), (-34.25, 0.75))
            Line((-34.25, 0.75), (-50.75, 0.75))
            ThreePointArc((-50.75, 0.75), (-52, 2), (-50.75, 3.25))
        make_face()
    cut_extrude_10 = extrude(amount=-CUT_EXTRUDE_10_DEPTH, mode=Mode.SUBTRACT)

    # 鏡射2: 除料-伸長10 across plane
    add(cut_extrude_10.mirror(Plane.ZY), mode=Mode.SUBTRACT)

    # Sketch3 → Cut-Extrude2 (cut)
    with BuildSketch(Plane.XY.offset(-55.705)):
        with BuildLine():
            Line((51.900266162, 13), (68.400266162, 13))
            ThreePointArc((68.400266162, 13), (69.650266162, 11.75), (68.400266162, 10.5))
            Line((68.400266162, 10.5), (51.900266162, 10.5))
            ThreePointArc((51.900266162, 10.5), (50.650266162, 11.75), (51.900266162, 13))
        make_face()
    extrude(amount=-CUT_EXTRUDE2_DEPTH, mode=Mode.SUBTRACT)

    # Fillet1
    fillet1_edges = [part.edges().sort_by_distance(p)[0] for p in [
        (-87.4, 6.5, 58.1),
        (87.4, 6.5, 58.1),
        (-87.4, 2, -58.1),
        (87.4, 2, -58.1),
    ]]
    fillet(fillet1_edges, radius=FILLET1_R)

    # Sketch4 → Cut-Extrude4 (cut)
    # profile 1 of 2: a face of its own
    with BuildSketch(Plane.XY.offset(60.1)):
        with Locations((60, 3.75)):
            Circle(SKETCH4_R)
        with Locations((60, 3.75)):
            Circle(SKETCH4_R_2, mode=Mode.SUBTRACT)
    # profile 2 of 2: a face of its own
    with BuildSketch(Plane.XY.offset(60.1)):
        with Locations((60, 3.75)):
            Circle(SKETCH4_R_2)
    cut_extrude4 = extrude(amount=-CUT_EXTRUDE4_DEPTH, mode=Mode.SUBTRACT)

    # Sketch4<3> → Cut-Extrude5 (cut)
    with BuildSketch(Plane.XY.offset(60.1)):
        with Locations((60, 3.75)):
            Circle(SKETCH4_3_R)
    cut_extrude5 = extrude(amount=-CUT_EXTRUDE5_DEPTH, mode=Mode.SUBTRACT)

    # Mirror3: Cut-Extrude4, Cut-Extrude5 across plane
    add(cut_extrude4.mirror(Plane.ZY), mode=Mode.SUBTRACT)
    add(cut_extrude5.mirror(Plane.ZY), mode=Mode.SUBTRACT)

    # Sketch5 → Cut-Extrude6 (cut)
    with BuildSketch(Plane(origin=(0, 0, 58.1), x_dir=(-1, 0, 0), z_dir=(0, 0, -1))):
        with BuildLine():
            Line((27, 3.25), (43.5, 3.25))
            ThreePointArc((43.5, 3.25), (44.75, 2), (43.5, 0.75))
            Line((43.5, 0.75), (27, 0.75))
            ThreePointArc((27, 0.75), (25.75, 2), (27, 3.25))
        make_face()
        with BuildLine():
            Line((-27, 3.25), (-43.5, 3.25))
            ThreePointArc((-43.5, 3.25), (-44.75, 2), (-43.5, 0.75))
            Line((-43.5, 0.75), (-27, 0.75))
            ThreePointArc((-27, 0.75), (-25.75, 2), (-27, 3.25))
        make_face()
    extrude(amount=-CUT_EXTRUDE6_DEPTH, mode=Mode.SUBTRACT)


solid = part.part
